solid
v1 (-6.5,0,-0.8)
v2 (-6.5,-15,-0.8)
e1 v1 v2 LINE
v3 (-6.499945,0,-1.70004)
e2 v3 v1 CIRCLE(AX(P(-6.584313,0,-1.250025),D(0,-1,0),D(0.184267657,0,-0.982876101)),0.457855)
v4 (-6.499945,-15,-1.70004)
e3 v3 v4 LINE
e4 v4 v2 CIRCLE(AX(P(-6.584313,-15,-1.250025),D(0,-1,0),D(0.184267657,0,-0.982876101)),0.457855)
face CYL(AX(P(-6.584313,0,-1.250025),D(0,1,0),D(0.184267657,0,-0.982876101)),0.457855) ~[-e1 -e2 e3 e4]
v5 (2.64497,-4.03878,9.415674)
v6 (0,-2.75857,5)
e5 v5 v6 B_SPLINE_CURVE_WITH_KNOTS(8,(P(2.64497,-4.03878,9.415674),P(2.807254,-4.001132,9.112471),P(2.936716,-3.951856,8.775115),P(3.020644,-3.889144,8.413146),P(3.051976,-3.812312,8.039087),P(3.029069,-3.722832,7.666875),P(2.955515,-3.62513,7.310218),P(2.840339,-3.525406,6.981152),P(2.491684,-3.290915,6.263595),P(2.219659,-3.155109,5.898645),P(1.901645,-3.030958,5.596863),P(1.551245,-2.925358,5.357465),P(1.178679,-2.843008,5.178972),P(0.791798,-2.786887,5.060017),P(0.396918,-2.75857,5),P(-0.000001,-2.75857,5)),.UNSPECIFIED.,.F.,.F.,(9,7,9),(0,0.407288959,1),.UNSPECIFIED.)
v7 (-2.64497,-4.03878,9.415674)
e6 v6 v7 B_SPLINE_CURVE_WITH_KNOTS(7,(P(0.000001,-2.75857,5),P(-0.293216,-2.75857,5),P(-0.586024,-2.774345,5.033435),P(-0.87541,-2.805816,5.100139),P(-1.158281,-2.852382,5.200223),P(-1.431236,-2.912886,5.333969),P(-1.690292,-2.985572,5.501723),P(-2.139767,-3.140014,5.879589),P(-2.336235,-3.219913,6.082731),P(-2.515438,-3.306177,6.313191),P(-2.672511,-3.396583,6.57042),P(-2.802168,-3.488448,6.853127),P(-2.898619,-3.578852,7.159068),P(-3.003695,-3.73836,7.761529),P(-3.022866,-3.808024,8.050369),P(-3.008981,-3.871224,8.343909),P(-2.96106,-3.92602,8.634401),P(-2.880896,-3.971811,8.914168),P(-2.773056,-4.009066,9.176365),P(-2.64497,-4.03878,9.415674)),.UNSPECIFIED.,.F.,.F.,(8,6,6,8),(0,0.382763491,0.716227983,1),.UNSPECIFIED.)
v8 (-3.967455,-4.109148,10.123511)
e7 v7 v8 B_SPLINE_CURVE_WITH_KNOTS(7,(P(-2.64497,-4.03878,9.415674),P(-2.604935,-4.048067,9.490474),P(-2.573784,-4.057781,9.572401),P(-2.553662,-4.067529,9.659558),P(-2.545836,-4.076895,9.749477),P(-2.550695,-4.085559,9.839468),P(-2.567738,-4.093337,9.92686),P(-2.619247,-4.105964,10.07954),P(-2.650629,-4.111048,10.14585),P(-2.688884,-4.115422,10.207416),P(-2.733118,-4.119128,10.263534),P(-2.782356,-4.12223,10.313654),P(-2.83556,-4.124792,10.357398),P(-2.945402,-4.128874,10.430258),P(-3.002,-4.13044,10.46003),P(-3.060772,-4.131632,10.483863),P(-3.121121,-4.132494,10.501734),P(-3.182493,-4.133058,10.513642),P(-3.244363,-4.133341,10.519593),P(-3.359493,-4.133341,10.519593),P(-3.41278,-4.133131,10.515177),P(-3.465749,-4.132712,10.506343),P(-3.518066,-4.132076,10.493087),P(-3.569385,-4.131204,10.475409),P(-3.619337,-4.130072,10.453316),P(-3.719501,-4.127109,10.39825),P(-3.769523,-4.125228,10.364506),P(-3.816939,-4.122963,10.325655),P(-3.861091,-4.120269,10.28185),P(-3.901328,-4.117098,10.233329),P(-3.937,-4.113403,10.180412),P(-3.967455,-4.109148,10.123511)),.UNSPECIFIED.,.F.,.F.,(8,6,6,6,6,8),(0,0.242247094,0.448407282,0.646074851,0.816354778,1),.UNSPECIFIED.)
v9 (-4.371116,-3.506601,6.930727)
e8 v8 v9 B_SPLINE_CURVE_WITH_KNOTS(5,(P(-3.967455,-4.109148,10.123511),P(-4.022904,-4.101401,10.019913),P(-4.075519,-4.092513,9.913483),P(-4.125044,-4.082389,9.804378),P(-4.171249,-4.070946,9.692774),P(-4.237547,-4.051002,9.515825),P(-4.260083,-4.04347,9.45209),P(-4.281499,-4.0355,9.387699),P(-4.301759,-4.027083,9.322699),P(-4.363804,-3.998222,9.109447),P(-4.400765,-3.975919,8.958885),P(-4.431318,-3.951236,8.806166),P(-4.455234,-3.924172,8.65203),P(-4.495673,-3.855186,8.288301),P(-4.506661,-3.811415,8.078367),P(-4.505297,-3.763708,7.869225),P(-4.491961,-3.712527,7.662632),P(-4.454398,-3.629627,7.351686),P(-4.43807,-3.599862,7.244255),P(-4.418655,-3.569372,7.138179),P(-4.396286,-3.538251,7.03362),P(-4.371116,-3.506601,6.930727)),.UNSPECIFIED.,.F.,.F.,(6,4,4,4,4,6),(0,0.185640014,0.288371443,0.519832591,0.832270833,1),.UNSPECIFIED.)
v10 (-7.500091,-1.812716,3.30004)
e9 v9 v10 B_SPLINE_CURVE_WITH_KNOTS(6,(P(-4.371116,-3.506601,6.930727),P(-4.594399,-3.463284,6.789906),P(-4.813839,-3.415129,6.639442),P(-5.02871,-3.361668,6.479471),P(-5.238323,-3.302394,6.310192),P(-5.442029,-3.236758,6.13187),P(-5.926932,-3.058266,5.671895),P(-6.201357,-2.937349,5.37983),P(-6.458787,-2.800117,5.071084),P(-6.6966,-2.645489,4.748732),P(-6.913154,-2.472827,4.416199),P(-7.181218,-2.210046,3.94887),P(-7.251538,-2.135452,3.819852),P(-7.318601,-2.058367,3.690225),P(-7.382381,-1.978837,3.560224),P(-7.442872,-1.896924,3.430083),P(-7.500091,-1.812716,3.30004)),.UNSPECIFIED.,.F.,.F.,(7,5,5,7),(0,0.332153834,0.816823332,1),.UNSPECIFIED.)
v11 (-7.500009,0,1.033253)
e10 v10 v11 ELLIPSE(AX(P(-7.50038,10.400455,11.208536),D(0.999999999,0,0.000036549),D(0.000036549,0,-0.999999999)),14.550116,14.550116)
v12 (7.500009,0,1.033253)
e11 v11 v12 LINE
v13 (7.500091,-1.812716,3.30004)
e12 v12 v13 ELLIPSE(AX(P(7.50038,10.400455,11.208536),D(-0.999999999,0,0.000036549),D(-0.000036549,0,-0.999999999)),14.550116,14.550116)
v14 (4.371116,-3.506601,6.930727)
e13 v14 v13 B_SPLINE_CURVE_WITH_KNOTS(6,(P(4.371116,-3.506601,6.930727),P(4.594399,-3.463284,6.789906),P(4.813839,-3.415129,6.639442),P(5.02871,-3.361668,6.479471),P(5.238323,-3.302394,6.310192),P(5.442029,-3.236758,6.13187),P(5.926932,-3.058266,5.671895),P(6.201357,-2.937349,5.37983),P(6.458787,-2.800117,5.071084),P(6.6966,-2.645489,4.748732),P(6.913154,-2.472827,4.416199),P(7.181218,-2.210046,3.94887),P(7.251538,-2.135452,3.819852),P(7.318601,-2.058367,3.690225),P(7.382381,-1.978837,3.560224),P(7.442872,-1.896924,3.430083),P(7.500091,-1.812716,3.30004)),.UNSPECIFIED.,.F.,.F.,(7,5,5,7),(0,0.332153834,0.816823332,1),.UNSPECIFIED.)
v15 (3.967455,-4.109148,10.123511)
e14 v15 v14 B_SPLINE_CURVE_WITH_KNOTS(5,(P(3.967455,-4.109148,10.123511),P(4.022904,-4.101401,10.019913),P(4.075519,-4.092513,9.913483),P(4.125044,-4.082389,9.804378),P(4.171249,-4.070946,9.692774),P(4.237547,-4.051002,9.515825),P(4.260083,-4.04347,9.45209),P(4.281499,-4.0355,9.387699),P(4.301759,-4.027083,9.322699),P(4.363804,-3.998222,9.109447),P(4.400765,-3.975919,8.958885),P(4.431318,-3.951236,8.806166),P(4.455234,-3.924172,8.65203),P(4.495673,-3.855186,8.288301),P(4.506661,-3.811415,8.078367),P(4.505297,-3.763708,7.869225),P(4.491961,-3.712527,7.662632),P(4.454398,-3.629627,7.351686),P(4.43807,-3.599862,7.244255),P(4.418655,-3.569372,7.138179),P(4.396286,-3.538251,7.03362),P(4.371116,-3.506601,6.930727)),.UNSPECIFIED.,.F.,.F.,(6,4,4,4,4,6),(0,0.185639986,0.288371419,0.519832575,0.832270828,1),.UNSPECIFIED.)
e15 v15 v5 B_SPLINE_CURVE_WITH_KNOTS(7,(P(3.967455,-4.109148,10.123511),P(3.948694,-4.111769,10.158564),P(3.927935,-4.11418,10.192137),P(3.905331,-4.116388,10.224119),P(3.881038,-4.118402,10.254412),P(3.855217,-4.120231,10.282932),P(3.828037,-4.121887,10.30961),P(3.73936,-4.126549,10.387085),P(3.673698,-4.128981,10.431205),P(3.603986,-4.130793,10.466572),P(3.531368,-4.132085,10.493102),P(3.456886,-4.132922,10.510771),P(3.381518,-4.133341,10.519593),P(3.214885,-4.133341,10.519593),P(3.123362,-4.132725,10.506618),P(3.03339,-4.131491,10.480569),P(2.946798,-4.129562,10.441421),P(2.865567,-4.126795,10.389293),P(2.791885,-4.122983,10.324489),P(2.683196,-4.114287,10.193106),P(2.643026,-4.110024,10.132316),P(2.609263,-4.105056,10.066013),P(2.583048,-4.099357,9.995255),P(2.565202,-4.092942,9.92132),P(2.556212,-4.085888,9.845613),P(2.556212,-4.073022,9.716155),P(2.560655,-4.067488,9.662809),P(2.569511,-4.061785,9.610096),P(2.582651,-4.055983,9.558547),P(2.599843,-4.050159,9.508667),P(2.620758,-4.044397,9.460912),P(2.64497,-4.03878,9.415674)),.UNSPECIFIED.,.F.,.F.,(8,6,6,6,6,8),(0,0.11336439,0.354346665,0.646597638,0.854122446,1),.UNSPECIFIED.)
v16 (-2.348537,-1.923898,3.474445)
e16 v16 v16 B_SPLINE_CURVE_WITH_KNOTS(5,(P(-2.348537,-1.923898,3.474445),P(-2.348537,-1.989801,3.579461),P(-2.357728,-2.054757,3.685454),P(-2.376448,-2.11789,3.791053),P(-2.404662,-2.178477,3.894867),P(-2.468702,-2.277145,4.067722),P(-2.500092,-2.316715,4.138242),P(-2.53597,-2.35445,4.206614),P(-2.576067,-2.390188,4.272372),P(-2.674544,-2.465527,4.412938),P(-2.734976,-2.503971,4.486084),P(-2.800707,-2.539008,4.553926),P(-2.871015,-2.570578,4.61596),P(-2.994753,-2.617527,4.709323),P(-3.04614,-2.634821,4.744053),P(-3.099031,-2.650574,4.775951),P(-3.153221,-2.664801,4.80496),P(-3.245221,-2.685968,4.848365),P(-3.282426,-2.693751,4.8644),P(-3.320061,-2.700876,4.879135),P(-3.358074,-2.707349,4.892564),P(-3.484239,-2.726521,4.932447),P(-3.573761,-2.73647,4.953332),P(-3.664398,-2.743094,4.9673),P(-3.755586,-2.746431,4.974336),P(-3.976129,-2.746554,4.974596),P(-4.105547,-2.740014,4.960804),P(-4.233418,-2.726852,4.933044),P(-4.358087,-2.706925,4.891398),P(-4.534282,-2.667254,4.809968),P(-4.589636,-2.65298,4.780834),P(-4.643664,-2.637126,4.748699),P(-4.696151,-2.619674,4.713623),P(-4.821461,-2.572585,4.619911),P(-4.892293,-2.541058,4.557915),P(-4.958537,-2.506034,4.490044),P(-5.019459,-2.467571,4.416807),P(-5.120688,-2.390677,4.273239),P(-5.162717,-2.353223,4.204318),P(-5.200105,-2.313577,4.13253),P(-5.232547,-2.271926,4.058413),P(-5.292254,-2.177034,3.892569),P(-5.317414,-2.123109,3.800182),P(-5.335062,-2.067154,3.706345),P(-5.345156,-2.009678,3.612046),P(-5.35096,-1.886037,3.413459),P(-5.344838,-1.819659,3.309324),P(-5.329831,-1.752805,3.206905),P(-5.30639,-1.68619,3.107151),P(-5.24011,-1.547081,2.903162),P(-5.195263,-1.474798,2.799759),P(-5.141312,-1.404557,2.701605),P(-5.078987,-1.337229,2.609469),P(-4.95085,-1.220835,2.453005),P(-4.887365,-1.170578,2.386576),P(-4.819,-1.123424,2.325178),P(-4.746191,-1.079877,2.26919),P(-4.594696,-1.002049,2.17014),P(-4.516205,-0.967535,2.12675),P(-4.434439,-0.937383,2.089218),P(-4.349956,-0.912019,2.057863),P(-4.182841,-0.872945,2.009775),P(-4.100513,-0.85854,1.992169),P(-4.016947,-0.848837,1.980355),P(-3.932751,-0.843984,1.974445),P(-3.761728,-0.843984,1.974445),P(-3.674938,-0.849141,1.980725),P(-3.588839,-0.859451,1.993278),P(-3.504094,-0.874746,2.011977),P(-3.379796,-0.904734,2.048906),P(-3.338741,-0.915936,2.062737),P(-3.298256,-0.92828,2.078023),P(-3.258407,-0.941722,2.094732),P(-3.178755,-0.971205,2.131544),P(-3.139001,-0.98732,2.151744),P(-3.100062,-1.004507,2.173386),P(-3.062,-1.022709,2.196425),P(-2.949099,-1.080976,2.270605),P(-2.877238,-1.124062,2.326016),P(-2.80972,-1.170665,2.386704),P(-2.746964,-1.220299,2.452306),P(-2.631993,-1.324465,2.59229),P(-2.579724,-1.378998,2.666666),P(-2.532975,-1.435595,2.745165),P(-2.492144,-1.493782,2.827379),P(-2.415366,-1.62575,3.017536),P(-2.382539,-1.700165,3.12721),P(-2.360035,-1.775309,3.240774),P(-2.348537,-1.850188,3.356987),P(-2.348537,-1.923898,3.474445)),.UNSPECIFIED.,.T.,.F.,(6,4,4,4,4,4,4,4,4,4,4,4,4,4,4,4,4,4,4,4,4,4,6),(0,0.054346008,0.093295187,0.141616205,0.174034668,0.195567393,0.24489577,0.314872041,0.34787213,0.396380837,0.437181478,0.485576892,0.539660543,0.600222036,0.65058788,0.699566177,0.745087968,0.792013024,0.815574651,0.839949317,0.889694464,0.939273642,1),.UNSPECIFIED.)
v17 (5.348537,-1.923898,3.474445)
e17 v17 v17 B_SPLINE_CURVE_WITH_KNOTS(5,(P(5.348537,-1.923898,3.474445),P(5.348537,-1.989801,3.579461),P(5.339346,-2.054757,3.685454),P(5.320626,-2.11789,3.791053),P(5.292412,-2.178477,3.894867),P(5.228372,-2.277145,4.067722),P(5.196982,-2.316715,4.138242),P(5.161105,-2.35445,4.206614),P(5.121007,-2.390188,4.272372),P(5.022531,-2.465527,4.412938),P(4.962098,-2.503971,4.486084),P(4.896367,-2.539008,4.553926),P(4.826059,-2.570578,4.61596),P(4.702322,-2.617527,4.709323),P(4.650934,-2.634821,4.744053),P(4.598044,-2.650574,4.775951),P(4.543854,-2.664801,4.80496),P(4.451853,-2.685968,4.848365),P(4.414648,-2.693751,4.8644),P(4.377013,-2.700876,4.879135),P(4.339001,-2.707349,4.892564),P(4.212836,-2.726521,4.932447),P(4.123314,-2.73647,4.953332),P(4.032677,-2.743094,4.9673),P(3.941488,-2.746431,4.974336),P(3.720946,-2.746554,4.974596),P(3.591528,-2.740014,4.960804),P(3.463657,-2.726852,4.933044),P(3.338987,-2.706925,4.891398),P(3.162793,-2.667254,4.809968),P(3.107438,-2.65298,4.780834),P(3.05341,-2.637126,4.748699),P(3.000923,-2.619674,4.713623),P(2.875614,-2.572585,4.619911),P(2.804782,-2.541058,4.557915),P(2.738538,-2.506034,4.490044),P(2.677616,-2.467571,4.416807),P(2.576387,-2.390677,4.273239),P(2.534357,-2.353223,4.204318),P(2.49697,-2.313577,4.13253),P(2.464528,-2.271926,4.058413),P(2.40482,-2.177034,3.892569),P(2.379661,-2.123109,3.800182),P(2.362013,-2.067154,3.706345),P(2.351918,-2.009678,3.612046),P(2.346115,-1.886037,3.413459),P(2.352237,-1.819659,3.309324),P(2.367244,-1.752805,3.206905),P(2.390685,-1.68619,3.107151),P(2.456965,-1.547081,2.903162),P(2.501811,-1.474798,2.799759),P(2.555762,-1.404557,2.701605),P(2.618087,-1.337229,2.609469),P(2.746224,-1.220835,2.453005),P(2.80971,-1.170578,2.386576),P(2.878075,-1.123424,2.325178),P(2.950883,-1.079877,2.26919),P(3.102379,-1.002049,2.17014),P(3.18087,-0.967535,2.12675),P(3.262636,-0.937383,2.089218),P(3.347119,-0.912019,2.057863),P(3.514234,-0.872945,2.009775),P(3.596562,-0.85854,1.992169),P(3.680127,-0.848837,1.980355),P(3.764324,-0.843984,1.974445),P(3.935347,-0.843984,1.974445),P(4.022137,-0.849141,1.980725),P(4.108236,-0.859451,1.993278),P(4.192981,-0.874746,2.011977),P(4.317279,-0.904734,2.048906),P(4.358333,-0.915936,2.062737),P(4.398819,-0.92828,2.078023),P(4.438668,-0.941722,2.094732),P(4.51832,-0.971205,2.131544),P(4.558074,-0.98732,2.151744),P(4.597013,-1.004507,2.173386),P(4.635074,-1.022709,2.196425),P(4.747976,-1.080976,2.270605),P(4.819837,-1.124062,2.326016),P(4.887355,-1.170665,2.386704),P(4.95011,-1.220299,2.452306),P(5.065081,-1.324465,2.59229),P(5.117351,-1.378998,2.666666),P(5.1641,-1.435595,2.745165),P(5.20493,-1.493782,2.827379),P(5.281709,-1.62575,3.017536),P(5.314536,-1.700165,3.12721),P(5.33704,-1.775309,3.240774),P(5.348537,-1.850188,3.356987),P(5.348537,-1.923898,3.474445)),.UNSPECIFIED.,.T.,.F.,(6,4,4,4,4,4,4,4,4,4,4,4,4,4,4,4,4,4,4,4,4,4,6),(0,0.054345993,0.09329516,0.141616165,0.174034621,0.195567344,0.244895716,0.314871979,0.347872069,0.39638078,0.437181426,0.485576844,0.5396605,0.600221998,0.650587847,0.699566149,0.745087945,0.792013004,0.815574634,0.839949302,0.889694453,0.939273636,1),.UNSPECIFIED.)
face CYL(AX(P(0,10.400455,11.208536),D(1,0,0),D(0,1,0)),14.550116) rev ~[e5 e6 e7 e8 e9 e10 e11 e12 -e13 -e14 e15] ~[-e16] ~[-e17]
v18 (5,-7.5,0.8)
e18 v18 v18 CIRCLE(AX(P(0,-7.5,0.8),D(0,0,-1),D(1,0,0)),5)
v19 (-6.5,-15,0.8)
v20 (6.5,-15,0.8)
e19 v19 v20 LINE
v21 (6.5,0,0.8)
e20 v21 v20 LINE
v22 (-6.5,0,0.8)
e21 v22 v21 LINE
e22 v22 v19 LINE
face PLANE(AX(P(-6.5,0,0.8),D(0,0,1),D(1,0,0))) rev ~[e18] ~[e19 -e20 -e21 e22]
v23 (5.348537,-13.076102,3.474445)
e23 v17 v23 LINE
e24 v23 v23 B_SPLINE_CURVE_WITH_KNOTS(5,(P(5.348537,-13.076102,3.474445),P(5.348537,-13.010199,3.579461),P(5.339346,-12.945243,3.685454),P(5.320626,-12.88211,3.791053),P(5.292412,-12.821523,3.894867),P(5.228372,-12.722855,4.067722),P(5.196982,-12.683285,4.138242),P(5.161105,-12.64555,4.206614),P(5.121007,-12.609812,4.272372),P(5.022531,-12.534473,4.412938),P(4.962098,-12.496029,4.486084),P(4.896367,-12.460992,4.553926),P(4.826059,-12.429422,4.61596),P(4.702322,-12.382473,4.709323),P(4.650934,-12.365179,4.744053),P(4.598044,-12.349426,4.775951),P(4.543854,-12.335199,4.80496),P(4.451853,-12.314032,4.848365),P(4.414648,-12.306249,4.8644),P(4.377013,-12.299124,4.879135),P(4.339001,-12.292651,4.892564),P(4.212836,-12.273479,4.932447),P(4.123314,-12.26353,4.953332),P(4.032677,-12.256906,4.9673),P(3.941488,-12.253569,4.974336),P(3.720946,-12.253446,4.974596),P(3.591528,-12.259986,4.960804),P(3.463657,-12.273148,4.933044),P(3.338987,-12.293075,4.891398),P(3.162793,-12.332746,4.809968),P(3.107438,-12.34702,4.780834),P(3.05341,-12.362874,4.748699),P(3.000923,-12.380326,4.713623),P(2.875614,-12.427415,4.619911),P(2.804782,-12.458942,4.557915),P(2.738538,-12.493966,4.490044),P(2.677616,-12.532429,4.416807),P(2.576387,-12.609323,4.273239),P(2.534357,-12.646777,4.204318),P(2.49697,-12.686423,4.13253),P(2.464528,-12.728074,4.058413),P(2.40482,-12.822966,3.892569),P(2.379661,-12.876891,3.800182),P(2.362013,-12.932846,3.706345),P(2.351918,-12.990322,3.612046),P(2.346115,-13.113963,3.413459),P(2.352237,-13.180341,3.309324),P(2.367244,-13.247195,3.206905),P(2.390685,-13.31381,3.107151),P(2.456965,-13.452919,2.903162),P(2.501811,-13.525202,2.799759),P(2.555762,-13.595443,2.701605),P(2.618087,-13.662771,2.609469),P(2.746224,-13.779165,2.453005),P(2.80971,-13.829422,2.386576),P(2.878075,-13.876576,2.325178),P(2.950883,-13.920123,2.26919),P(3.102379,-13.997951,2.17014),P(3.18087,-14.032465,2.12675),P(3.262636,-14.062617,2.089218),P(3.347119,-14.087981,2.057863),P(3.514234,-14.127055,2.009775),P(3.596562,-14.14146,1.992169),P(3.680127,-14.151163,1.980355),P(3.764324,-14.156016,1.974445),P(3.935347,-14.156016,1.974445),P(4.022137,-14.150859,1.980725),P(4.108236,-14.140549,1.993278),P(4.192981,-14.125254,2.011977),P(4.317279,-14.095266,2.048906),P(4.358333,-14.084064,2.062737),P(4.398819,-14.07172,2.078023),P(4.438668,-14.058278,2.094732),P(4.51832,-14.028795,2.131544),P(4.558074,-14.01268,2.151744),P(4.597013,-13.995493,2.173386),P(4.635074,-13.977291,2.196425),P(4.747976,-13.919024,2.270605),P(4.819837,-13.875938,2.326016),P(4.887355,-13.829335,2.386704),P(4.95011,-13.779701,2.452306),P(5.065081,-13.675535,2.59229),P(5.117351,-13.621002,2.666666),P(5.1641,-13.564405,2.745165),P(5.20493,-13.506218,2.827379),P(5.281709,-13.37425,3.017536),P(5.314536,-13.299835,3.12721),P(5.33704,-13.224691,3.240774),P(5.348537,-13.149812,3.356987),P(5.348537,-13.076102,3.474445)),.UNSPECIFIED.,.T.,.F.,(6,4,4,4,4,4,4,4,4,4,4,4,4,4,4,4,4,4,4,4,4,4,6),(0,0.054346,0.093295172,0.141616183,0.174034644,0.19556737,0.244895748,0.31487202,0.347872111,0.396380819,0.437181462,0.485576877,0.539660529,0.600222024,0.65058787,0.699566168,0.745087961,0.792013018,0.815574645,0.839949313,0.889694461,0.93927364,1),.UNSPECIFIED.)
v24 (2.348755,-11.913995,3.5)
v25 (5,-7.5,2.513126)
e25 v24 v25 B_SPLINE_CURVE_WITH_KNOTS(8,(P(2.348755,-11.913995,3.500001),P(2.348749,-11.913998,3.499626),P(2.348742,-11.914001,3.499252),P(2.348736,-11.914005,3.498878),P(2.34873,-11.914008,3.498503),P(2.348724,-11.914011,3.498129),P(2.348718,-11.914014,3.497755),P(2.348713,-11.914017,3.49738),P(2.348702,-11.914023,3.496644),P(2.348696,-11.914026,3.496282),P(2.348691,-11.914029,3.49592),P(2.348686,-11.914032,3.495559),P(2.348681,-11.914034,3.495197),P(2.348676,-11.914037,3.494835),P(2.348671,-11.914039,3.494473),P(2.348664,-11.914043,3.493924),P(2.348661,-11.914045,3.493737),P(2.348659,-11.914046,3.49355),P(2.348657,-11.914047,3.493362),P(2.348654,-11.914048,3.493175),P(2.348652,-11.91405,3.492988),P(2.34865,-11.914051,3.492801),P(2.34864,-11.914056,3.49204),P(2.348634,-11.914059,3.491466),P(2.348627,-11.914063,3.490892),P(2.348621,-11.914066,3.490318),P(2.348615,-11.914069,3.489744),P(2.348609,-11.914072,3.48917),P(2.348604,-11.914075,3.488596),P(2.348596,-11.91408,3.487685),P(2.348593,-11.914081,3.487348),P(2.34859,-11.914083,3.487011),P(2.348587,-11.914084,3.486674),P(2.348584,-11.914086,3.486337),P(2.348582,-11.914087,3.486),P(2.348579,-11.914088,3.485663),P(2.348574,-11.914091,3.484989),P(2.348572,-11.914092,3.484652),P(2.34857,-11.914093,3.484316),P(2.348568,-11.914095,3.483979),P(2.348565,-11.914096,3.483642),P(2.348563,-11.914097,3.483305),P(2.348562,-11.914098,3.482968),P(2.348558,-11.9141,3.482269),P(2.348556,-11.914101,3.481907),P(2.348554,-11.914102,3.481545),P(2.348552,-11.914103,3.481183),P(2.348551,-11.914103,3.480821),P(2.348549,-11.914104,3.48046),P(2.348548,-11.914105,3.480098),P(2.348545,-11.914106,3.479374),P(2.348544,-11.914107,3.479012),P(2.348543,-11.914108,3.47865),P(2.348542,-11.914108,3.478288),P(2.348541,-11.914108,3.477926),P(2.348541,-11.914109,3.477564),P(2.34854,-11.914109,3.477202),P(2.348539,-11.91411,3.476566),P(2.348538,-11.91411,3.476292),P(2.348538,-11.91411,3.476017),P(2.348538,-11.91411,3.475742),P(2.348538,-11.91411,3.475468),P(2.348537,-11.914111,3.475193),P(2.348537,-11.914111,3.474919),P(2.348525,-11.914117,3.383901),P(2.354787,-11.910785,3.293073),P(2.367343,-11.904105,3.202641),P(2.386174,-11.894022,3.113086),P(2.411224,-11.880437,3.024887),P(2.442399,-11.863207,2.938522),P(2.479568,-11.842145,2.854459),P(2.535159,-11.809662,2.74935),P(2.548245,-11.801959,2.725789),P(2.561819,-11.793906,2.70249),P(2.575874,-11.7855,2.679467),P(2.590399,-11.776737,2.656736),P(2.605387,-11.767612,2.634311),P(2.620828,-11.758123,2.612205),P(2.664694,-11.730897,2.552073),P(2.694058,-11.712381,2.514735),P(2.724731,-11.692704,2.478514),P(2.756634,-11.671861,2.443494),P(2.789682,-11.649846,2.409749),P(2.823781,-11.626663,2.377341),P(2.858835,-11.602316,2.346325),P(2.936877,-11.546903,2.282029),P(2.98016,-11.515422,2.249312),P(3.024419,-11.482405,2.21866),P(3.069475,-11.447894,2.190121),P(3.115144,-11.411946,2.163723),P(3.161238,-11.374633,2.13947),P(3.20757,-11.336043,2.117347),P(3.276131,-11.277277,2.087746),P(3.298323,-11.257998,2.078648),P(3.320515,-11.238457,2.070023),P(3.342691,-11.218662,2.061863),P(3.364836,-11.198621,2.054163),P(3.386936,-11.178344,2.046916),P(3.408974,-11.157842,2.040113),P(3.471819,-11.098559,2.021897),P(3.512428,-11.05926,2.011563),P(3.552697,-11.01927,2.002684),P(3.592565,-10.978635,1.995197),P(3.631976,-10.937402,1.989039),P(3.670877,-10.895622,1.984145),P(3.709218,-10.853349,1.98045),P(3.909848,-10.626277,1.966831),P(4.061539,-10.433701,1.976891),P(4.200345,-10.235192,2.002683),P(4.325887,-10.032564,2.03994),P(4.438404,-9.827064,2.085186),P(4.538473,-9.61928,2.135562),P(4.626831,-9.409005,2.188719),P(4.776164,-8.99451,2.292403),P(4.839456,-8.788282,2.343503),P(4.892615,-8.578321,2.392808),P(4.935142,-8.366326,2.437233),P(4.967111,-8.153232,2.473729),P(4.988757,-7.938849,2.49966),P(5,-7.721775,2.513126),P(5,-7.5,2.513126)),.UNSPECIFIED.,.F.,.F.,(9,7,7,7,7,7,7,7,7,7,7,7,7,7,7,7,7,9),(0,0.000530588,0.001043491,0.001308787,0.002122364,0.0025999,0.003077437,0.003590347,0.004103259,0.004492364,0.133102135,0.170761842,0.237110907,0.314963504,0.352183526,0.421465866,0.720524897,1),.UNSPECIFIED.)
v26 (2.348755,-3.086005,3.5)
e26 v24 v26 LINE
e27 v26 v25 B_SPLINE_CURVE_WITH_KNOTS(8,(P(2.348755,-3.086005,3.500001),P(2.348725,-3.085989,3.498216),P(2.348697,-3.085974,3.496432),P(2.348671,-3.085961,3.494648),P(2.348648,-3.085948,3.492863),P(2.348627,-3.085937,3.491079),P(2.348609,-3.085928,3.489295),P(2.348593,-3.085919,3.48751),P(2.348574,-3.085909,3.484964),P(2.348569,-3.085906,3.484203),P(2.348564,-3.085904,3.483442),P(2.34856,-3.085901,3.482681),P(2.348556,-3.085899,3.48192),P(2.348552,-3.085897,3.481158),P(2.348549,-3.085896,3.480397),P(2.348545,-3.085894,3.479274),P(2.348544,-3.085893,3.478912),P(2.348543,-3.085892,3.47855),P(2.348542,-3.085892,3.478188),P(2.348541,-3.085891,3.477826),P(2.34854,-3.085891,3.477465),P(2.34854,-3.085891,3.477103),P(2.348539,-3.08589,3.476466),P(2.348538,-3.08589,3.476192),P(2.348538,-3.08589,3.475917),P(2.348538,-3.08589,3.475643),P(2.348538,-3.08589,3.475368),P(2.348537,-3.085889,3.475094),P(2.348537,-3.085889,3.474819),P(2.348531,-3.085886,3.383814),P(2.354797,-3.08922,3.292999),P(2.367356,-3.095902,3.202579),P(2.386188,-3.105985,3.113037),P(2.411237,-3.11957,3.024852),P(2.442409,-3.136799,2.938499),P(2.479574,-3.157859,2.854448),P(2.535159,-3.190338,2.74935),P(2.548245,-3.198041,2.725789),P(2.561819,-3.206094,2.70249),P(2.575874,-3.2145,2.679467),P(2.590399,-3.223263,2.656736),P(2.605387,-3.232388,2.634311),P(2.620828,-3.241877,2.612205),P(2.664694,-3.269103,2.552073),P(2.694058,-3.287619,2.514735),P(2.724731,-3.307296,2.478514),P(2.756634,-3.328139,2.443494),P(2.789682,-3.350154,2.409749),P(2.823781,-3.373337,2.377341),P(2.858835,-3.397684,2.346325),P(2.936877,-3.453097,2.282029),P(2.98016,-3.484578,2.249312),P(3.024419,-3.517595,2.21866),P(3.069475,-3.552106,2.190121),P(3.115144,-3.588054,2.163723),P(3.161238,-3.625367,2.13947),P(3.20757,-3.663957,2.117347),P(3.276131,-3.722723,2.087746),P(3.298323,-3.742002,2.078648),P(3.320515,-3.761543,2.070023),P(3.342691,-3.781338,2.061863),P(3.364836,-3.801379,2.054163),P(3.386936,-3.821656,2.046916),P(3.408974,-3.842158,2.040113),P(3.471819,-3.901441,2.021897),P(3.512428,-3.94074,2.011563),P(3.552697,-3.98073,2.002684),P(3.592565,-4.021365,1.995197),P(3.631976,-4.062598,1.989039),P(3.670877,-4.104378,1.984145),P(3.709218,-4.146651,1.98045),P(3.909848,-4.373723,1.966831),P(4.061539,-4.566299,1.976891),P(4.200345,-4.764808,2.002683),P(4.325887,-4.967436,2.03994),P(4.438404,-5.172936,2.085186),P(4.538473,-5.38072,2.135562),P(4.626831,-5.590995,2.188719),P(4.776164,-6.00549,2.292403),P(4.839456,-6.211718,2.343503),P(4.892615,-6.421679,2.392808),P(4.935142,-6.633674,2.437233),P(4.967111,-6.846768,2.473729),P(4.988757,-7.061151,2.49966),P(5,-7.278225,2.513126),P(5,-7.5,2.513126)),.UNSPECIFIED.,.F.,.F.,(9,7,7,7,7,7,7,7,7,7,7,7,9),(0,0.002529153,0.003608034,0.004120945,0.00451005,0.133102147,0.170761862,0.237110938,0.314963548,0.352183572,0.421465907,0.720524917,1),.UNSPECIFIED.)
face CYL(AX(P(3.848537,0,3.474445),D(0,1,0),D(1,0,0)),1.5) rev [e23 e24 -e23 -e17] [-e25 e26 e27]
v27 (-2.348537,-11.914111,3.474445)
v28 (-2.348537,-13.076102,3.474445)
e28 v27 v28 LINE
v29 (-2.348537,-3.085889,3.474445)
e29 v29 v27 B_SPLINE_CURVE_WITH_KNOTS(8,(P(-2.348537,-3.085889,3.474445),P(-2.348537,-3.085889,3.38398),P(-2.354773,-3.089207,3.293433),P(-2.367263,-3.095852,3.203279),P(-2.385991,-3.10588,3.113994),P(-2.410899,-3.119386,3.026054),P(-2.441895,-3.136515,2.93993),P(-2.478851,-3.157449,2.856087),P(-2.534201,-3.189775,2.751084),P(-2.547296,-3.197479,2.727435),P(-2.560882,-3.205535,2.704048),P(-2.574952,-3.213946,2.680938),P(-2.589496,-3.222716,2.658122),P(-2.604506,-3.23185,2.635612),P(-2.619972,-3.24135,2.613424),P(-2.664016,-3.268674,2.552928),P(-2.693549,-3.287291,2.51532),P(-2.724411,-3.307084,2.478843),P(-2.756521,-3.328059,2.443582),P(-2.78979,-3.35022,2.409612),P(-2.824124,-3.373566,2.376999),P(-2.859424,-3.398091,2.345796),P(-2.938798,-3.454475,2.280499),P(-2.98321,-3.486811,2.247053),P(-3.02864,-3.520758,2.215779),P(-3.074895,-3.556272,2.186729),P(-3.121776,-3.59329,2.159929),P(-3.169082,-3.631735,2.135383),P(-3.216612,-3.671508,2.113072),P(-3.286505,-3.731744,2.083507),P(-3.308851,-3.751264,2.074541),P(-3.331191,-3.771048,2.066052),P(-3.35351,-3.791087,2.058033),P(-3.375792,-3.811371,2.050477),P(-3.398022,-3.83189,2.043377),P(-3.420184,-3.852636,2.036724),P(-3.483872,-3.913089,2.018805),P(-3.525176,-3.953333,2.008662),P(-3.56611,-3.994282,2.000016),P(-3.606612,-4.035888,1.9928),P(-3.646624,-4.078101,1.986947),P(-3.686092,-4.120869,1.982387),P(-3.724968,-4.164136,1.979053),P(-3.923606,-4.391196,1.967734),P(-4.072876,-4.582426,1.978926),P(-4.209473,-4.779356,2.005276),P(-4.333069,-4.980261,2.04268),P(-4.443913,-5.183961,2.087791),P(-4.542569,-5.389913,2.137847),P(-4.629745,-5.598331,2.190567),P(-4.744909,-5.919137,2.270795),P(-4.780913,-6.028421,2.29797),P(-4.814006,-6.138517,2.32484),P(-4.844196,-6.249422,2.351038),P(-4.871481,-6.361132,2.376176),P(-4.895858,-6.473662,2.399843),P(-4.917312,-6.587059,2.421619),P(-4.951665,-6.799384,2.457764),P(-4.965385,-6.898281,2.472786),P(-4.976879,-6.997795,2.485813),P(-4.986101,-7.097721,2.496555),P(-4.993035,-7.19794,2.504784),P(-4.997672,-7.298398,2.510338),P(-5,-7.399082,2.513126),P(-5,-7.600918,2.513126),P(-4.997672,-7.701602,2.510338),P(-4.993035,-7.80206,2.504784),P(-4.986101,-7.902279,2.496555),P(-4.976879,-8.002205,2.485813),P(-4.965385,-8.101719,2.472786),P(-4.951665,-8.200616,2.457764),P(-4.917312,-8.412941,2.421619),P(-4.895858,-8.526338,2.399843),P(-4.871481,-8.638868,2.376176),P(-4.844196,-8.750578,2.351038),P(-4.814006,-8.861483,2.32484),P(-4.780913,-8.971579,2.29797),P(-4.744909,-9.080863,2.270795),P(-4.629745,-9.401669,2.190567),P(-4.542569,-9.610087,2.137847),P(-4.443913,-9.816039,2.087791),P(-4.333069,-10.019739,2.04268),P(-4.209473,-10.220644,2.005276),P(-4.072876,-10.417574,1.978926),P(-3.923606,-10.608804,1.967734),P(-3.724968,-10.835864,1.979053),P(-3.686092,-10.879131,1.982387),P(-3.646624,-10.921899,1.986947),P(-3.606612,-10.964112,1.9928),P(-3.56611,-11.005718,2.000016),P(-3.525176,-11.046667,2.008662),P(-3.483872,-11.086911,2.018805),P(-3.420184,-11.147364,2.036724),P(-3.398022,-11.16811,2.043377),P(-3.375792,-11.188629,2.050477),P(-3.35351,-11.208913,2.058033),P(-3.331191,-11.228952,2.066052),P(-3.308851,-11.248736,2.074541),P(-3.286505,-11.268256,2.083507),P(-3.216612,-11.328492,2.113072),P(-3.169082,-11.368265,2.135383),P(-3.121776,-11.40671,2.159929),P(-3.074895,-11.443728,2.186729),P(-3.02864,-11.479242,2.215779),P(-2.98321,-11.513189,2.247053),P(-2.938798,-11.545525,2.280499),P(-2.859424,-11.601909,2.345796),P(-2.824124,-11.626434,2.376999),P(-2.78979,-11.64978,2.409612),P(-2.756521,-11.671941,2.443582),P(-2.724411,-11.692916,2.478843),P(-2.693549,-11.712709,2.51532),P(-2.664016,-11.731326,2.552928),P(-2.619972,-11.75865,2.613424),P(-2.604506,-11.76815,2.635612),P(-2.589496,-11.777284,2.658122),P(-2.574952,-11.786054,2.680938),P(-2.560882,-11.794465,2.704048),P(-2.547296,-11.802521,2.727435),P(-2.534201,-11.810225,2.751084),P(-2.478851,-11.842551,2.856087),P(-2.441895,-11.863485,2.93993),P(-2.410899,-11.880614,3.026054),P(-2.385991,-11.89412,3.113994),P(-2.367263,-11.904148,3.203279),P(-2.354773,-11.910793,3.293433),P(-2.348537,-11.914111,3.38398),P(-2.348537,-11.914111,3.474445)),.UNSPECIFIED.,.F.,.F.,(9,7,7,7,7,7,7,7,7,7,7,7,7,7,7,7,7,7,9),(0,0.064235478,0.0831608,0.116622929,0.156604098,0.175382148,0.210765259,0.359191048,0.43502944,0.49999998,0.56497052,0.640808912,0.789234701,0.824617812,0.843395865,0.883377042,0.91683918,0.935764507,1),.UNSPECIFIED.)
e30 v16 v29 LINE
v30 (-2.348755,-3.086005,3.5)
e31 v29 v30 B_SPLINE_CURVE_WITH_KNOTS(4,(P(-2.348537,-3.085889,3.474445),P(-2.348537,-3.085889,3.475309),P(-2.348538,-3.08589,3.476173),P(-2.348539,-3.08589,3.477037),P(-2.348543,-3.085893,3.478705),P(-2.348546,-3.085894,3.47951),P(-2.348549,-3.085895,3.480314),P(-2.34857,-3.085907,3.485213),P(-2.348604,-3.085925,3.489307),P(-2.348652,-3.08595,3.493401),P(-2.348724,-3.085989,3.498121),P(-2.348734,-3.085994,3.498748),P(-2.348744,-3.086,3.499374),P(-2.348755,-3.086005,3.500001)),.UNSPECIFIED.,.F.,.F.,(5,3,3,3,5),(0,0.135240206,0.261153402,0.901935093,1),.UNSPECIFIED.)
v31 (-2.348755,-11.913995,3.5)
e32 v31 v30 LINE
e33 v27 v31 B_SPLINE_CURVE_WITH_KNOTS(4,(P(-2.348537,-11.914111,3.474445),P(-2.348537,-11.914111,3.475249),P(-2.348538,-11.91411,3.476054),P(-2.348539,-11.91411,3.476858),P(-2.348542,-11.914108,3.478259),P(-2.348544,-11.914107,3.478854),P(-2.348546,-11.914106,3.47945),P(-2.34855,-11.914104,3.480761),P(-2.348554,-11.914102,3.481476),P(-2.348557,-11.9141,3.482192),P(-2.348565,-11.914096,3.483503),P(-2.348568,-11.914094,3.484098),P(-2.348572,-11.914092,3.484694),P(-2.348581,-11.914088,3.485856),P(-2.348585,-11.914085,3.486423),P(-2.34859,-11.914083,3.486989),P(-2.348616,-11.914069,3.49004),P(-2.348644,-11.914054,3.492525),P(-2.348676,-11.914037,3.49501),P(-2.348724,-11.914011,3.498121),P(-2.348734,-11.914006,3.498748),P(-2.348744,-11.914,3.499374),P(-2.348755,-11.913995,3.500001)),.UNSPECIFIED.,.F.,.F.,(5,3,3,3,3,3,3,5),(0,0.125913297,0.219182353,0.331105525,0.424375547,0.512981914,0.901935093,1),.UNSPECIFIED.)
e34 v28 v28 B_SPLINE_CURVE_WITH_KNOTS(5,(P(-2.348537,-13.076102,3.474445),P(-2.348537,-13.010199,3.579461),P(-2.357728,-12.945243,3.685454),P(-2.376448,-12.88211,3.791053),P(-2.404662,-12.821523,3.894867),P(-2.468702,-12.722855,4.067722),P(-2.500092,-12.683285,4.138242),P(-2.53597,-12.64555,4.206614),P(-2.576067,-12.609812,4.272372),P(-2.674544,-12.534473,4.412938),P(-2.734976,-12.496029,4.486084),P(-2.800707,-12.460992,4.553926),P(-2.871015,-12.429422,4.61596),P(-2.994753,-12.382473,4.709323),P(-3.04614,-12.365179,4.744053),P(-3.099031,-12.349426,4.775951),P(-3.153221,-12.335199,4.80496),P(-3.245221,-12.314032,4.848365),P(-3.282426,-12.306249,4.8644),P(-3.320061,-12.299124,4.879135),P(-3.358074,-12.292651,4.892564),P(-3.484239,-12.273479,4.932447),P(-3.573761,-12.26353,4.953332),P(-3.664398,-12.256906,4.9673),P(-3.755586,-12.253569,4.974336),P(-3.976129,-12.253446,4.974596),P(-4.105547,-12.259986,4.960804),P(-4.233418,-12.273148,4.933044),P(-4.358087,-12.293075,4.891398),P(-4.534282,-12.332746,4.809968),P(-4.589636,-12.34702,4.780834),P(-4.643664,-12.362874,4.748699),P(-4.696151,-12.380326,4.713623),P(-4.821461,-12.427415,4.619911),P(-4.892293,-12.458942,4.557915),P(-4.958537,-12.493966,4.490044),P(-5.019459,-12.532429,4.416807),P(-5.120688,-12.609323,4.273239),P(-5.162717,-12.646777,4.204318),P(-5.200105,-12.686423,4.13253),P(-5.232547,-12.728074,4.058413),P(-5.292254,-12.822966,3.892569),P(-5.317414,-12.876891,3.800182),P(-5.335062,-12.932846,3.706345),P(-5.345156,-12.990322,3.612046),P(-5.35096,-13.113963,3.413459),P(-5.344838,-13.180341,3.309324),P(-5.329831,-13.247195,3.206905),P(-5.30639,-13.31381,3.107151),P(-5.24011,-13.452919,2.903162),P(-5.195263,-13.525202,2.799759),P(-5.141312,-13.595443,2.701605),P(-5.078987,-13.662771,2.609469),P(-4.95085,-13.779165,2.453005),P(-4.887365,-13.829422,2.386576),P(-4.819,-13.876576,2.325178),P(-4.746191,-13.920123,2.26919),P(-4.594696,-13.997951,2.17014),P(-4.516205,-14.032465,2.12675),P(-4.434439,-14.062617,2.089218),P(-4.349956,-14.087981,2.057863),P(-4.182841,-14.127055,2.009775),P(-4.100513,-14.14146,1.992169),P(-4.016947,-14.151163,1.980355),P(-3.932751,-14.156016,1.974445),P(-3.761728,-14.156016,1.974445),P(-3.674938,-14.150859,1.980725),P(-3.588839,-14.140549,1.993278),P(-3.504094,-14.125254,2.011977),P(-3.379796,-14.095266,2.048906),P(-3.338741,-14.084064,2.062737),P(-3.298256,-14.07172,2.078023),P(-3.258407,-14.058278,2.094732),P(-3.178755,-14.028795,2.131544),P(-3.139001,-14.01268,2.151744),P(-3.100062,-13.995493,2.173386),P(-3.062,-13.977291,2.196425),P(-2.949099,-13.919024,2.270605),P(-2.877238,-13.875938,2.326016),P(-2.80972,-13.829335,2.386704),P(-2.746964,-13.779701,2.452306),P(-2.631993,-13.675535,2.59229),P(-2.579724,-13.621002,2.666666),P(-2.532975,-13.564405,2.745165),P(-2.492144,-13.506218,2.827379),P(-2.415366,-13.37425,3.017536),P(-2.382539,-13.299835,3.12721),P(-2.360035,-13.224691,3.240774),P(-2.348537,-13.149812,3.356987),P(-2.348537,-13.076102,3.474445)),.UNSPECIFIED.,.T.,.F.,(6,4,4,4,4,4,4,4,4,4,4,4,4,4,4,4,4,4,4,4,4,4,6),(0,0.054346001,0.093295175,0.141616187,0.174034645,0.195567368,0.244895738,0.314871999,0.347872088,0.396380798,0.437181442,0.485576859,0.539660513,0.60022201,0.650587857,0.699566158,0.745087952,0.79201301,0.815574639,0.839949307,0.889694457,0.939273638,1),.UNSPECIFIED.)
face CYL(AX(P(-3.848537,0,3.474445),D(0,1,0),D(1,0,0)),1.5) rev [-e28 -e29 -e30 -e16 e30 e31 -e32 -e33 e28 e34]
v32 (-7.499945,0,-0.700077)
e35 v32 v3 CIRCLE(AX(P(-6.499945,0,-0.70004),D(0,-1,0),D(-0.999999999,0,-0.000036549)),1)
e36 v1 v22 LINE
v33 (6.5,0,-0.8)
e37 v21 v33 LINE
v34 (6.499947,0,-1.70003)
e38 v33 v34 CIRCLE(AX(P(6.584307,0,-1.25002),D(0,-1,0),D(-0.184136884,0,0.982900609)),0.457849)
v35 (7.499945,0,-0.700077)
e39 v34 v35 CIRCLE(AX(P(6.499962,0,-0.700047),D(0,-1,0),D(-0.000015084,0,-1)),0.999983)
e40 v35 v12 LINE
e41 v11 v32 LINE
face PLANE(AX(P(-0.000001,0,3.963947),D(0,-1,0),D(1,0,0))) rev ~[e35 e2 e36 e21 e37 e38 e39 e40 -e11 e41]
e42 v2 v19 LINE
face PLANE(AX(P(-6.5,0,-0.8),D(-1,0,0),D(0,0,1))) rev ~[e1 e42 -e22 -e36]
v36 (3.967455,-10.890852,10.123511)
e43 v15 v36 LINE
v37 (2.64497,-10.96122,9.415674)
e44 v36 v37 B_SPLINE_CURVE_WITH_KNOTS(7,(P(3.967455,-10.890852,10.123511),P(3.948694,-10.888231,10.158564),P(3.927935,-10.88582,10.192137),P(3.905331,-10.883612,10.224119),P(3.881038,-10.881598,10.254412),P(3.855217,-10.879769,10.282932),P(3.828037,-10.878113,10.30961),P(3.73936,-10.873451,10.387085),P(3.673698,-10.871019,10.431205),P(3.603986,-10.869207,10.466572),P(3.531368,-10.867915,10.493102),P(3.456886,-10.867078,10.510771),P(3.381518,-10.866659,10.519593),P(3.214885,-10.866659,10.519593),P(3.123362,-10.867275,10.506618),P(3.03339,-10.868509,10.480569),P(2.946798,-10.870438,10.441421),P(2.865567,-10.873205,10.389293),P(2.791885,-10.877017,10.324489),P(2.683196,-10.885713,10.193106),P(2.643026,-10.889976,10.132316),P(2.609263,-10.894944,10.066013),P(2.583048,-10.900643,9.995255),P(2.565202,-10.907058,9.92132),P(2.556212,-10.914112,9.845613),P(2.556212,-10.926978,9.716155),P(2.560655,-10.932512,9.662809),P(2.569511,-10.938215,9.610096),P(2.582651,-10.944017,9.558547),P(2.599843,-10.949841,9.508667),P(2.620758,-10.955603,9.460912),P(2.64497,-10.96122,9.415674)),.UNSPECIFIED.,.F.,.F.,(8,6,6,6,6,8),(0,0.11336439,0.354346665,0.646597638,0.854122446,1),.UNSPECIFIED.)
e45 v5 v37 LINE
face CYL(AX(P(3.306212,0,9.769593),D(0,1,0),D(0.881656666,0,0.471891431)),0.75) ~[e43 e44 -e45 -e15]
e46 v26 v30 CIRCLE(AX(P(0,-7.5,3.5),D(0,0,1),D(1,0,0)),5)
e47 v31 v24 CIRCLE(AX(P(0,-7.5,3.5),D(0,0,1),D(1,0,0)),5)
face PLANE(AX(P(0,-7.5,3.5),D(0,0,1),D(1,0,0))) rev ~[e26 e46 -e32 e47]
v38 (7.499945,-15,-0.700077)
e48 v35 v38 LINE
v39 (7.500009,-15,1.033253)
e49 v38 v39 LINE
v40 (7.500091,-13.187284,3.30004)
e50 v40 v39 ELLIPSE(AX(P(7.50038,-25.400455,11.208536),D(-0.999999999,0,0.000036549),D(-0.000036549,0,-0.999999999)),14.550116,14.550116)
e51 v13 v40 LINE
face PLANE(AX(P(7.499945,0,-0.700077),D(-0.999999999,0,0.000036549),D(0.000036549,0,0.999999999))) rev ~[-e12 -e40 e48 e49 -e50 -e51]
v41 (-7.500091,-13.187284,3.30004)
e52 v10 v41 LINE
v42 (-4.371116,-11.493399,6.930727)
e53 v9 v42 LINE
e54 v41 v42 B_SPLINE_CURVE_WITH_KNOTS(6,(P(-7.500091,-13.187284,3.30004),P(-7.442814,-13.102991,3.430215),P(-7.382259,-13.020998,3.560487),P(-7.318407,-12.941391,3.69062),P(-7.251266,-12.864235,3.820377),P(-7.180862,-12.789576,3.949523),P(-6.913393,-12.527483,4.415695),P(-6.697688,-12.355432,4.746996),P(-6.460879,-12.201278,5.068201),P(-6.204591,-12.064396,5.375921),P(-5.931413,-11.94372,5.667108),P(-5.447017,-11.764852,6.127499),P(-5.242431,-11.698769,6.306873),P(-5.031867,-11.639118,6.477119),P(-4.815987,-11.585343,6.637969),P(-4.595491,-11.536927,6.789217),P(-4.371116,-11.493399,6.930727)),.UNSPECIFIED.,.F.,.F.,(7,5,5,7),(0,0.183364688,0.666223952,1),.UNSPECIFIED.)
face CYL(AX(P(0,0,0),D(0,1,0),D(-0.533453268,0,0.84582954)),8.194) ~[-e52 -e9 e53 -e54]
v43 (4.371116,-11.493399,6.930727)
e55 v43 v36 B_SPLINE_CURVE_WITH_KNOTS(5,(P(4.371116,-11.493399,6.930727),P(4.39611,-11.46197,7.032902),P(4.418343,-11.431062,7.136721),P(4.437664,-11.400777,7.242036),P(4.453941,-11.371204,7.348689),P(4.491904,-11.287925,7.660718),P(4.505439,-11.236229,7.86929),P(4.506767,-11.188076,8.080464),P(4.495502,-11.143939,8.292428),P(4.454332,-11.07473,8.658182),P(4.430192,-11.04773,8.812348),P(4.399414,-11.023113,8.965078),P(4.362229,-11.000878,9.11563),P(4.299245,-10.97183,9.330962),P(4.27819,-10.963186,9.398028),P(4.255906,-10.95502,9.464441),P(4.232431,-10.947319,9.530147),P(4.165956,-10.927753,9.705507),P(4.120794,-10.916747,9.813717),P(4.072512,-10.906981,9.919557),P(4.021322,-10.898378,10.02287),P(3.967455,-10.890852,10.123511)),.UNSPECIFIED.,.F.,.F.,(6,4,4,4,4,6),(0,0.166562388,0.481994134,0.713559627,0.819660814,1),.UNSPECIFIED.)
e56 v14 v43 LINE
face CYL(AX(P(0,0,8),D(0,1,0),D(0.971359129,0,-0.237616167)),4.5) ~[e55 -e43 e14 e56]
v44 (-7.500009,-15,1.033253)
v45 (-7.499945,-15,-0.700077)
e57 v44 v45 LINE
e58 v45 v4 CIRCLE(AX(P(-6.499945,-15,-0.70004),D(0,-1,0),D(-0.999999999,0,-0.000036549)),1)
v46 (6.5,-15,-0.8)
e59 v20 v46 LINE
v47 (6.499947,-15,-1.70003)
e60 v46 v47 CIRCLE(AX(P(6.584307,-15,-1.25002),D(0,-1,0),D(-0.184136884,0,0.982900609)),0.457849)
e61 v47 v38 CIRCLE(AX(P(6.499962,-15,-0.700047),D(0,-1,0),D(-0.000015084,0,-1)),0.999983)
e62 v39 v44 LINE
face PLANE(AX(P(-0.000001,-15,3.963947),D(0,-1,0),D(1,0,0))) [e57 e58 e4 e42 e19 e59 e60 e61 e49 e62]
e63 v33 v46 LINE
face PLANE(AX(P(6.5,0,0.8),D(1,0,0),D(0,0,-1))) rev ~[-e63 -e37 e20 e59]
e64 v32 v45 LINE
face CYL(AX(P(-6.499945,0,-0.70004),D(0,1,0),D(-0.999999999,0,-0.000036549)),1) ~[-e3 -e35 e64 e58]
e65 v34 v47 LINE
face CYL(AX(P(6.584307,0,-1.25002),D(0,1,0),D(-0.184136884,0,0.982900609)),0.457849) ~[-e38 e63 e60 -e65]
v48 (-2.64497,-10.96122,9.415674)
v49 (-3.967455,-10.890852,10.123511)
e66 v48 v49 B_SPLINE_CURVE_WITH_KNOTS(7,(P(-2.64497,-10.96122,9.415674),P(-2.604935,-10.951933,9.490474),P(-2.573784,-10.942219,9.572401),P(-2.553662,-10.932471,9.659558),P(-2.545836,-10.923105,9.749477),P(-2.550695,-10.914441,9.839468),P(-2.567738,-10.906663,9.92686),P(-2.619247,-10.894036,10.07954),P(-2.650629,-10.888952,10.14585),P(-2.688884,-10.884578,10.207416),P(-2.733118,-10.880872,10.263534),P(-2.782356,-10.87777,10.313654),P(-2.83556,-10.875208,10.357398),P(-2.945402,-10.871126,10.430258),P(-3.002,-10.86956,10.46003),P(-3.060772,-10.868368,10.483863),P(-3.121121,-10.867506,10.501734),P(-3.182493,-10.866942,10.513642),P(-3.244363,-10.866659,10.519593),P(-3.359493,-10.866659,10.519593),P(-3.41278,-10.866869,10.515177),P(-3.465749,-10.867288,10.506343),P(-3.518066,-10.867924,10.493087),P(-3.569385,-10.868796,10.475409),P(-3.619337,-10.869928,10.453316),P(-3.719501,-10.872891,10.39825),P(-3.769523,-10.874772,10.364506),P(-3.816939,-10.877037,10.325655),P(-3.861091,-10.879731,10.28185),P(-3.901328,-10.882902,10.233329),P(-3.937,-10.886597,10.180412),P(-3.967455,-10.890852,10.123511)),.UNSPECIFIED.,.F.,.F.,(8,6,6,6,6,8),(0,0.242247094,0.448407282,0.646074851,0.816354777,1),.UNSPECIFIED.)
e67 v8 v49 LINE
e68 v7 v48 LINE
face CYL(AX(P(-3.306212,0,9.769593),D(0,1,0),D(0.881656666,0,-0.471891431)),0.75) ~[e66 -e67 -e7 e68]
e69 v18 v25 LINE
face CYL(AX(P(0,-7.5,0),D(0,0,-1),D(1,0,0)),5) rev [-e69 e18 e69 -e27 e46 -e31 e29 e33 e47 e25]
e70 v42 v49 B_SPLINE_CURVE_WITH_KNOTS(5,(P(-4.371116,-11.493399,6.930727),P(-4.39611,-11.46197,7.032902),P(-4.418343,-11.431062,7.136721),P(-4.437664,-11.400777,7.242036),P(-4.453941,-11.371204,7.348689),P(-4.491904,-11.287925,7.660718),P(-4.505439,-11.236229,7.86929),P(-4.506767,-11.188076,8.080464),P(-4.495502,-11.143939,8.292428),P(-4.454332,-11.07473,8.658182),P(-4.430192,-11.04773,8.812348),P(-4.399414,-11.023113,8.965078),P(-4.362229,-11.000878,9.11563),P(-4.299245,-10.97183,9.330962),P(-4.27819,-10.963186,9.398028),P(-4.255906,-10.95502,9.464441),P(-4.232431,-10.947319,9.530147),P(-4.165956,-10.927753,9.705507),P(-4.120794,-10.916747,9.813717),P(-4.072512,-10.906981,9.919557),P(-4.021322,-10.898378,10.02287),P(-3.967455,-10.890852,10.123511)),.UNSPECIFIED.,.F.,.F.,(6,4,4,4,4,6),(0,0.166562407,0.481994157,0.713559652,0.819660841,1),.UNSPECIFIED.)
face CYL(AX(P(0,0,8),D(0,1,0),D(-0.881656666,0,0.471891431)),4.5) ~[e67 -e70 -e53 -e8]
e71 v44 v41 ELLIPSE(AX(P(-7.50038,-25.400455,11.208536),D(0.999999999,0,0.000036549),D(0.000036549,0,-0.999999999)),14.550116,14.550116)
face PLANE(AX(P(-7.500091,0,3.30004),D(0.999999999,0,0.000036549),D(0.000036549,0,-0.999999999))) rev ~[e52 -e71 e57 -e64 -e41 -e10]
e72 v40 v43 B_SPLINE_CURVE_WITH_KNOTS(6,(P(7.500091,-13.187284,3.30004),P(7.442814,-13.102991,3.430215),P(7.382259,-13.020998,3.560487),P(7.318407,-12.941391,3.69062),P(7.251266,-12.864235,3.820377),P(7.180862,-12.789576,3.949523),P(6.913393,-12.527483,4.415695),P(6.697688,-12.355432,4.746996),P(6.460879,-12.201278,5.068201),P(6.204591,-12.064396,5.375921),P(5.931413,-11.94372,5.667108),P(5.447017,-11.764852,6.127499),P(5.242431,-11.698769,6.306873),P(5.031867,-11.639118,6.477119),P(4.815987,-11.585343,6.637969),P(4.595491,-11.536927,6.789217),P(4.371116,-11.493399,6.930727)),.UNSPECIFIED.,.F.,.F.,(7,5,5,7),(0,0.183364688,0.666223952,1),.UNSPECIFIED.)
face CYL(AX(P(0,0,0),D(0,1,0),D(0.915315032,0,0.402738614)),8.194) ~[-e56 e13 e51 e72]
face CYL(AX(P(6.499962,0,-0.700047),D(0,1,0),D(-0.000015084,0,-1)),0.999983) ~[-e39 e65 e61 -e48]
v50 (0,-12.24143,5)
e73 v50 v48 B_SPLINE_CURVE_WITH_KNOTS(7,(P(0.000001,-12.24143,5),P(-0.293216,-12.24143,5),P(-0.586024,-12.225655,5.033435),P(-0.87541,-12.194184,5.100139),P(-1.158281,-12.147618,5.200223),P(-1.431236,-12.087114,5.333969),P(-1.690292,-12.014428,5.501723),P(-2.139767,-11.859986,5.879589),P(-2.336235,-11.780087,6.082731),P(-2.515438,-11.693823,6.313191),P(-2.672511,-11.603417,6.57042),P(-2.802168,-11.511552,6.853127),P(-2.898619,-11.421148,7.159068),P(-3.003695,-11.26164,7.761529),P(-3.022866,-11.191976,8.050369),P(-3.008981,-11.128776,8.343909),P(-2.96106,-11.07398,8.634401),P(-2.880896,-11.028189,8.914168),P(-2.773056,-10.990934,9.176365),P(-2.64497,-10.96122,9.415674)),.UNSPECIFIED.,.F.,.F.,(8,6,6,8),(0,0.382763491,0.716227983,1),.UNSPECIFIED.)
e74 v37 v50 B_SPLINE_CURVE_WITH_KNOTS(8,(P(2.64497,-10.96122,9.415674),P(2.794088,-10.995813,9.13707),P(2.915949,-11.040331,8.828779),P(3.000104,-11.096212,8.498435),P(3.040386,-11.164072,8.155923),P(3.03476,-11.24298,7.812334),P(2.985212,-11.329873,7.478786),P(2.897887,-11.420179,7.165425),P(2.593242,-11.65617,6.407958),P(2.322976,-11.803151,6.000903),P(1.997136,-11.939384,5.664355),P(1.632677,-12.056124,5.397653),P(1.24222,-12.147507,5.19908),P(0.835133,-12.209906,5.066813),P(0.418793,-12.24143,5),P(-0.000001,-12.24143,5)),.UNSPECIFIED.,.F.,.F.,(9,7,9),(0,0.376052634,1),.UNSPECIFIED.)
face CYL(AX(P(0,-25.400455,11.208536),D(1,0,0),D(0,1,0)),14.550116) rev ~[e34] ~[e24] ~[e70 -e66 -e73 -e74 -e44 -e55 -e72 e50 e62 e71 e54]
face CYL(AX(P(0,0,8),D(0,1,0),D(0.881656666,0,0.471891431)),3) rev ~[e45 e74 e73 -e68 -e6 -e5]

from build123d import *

# Parameters (mm, degrees)
F0_R          = 1.5
F1_DEPTH      = 15
F2_R          = 14.550115737
F3_DEPTH      = 25
F3_DEPTH_BACK = 25
F4_R          = 5
F5_DEPTH      = 3.5


# Not quite as in the source:
# - ends of sketch curves that miss each other by under 0.0002 mm in the source are joined


with BuildPart() as f1:
    # F0 (on Front) → F1 (new body)
    with BuildSketch(Plane.XZ):
        with BuildLine():
            Line((-6.5, -0.8), (-6.5, 0.8))
            Line((-6.5, 0.8), (6.5, 0.8))
            Line((6.5, 0.8), (6.5, -0.8))
            ThreePointArc((6.5, -0.8), (6.1264578545, -1.2499931592), (6.4999470351, -1.7000302796))
            ThreePointArc((6.4999470351, -1.7000302796), (7.2070390333, -1.4071599085), (7.4999451737, -0.7000767547))
            Line((7.4999451737, -0.7000767547), (7.5000913757, 3.3000402053))
            ThreePointArc((7.5000913757, 3.3000402053), (6.2070011857, 5.3492777345), (4.3711160801, 6.93072725))
            ThreePointArc((4.3711160801, 6.93072725), (4.4644607322, 8.5644381014), (3.967454999, 10.1235114388))
            ThreePointArc((3.967454999, 10.1235114388), (2.952293926, 10.4308353655), (2.6449699993, 9.4156742925))
            ThreePointArc((2.6449699993, 9.4156742925), (0, 5), (-2.6449699993, 9.4156742925))
            ThreePointArc((-2.6449699993, 9.4156742925), (-2.952293926, 10.4308353655), (-3.967454999, 10.1235114388))
            ThreePointArc((-3.967454999, 10.1235114388), (-4.4644607322, 8.5644381014), (-4.3711160801, 6.93072725))
            ThreePointArc((-4.3711160801, 6.93072725), (-6.2070011857, 5.3492777345), (-7.5000913757, 3.3000402053))
            Line((-7.5000913757, 3.3000402053), (-7.4999451737, -0.7000767547))
            ThreePointArc((-7.4999451737, -0.7000767547), (-7.2070390333, -1.4071599085), (-6.4999451744, -1.7000402053))
            ThreePointArc((-6.4999451744, -1.7000402053), (-6.1264578541, -1.2500021402), (-6.5, -0.8))
        make_face()
        with Locations((-3.848537337, 3.4744446166)):
            Circle(F0_R, mode=Mode.SUBTRACT)
        with Locations((3.848537337, 3.4744446166)):
            Circle(F0_R, mode=Mode.SUBTRACT)
    extrude(amount=F1_DEPTH)

    # F2 (on Right) → F3 (cut, two sides)
    with BuildSketch(Plane.YZ) as f3_sk:
        with Locations((-25.4004554451, 11.2085361034)):
            Circle(F2_R)
        with Locations((10.4004554451, 11.2085361034)):
            Circle(F2_R)
    extrude(amount=-F3_DEPTH, mode=Mode.SUBTRACT)
    extrude(f3_sk.sketch, amount=F3_DEPTH_BACK, mode=Mode.SUBTRACT)

    # F4 (on Top) → F5 (cut)
    with BuildSketch(Plane.XY):
        with Locations((0, -7.5)):
            Circle(F4_R)
    extrude(amount=F5_DEPTH, mode=Mode.SUBTRACT)


solid = f1.part
